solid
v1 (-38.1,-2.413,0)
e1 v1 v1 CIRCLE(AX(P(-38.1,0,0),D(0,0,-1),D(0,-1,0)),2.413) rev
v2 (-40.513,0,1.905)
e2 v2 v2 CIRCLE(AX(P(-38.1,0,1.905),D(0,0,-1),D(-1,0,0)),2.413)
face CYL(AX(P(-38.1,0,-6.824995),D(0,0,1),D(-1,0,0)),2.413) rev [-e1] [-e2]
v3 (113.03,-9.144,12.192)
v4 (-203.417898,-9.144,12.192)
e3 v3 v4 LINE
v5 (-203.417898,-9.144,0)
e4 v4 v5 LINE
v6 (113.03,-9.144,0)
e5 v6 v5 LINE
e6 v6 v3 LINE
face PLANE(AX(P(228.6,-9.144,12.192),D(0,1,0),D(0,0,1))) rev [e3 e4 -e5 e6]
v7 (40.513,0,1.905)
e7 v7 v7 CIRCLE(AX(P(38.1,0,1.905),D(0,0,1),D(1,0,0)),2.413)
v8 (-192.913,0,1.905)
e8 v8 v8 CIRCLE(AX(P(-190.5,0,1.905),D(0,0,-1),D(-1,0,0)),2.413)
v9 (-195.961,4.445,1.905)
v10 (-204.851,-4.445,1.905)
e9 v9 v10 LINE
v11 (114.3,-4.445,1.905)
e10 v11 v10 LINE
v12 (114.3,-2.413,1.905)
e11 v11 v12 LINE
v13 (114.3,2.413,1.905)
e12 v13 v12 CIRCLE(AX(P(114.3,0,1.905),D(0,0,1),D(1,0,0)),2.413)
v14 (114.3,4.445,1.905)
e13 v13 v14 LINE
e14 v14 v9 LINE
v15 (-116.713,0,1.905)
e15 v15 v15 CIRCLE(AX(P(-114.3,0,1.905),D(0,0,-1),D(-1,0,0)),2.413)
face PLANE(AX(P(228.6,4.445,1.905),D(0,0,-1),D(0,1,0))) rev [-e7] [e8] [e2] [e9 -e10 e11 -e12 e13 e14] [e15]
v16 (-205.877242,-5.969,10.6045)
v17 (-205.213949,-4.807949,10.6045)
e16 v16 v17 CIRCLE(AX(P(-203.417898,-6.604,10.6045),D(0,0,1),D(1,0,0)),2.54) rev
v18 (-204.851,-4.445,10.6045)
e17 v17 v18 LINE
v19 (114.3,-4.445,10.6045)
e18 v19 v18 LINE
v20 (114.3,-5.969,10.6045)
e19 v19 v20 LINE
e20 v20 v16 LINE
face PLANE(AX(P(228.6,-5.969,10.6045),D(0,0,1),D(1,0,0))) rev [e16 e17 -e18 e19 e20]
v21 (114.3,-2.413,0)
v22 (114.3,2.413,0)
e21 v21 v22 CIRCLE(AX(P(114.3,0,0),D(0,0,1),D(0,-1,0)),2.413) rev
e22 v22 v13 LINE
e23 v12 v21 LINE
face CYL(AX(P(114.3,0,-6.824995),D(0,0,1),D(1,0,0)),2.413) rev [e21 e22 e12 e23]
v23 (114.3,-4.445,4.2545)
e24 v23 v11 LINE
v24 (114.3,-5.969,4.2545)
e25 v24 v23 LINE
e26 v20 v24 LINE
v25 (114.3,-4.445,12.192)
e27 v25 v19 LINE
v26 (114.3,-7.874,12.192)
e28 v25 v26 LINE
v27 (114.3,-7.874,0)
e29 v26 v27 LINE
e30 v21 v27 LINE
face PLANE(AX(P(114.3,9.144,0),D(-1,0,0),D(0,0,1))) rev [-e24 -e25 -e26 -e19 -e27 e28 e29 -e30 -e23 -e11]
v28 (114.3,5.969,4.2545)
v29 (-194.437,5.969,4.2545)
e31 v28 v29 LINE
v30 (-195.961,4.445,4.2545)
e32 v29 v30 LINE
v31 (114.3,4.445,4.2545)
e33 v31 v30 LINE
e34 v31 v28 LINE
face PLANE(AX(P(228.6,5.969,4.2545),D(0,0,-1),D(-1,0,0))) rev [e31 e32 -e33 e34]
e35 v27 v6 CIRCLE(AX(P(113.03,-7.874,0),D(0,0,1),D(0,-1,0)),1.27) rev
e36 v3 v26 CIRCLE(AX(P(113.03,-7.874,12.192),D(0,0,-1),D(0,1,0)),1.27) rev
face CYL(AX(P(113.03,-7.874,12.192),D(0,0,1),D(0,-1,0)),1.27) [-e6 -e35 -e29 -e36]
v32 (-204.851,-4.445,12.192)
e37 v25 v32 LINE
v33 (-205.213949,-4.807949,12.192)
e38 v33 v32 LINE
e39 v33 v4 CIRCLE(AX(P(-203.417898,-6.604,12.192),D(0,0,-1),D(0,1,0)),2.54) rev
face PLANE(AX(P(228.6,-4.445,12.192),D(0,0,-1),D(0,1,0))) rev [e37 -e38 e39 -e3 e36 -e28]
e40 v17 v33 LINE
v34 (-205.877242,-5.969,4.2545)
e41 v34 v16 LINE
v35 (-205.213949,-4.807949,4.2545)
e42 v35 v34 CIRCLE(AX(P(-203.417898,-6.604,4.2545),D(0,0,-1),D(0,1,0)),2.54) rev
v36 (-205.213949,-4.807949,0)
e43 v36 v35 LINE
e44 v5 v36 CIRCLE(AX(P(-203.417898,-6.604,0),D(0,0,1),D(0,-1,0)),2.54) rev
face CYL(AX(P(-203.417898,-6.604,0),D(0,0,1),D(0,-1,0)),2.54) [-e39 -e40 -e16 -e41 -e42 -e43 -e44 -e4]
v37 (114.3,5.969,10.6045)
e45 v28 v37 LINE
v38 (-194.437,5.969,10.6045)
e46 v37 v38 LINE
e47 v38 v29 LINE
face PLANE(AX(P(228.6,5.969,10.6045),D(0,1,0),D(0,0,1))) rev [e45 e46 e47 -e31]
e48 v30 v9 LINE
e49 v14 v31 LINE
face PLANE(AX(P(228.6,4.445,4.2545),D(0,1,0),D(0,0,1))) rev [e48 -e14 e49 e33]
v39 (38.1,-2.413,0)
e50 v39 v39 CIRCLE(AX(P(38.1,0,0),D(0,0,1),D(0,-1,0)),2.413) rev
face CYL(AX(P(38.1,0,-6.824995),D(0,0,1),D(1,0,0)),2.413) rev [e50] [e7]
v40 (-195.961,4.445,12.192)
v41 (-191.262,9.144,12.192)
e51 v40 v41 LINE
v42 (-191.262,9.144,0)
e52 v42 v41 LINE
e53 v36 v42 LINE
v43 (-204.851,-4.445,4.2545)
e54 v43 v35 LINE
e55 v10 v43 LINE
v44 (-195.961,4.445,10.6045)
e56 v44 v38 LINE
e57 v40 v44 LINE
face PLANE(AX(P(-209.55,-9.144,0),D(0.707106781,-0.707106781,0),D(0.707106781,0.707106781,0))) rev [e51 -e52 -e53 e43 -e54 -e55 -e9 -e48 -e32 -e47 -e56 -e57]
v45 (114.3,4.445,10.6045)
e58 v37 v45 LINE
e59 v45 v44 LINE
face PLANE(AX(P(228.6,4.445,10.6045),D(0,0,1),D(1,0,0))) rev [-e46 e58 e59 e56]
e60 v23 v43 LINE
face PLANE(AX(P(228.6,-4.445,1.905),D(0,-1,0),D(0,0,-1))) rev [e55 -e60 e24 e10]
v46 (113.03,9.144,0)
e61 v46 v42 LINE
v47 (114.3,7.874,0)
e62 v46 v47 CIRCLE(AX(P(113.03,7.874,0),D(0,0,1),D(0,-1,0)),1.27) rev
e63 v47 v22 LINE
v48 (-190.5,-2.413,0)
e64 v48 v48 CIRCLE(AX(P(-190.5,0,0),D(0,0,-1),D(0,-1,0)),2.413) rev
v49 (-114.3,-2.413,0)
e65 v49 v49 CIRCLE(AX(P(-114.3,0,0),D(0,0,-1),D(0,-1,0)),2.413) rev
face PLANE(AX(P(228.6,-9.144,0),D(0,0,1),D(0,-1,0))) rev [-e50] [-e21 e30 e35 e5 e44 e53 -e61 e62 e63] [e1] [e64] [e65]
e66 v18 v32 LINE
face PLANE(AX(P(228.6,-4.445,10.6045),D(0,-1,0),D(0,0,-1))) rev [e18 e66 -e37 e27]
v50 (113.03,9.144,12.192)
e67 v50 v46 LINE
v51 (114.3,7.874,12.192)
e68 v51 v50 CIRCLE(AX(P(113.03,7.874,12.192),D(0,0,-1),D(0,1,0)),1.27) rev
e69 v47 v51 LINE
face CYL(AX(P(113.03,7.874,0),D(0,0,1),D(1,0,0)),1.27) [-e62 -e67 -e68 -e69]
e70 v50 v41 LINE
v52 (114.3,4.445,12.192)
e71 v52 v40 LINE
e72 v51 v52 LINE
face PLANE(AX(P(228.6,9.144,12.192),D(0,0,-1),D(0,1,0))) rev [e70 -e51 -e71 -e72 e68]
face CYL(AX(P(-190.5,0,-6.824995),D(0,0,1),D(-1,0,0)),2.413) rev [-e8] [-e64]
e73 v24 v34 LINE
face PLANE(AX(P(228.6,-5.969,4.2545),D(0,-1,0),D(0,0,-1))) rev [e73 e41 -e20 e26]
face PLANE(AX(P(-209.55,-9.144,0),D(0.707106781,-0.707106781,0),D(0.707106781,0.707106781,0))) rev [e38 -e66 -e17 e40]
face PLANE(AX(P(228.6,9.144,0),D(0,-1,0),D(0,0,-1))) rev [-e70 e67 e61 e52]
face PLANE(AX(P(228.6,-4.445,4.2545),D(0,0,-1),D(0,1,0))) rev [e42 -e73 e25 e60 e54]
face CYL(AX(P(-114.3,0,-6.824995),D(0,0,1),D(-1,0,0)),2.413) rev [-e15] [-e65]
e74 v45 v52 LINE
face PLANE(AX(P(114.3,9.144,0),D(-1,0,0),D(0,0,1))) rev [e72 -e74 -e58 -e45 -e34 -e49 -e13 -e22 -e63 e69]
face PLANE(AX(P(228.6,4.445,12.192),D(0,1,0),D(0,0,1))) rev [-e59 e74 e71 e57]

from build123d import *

# Parameters (mm, degrees)
BOSS_EXTRUDE1_DEPTH = 228.6
SKETCH3_R           = 2.413
CUT_EXTRUDE1_DEPTH  = 1.905
LPATTERN1_COUNT     = 3
LPATTERN1_PITCH     = 76.2
CUT_EXTRUDE3_DEPTH  = 230.107436806
FILLET1_R           = 2.54
SKETCH5_W           = 114.3
SKETCH5_H           = 18.288
CUT_EXTRUDE4_DEPTH  = 230.107436806
FILLET2_R           = 1.27


with BuildPart() as part:
    # Sketch2 → Boss-Extrude1 (new, symmetric)
    with BuildSketch(Plane(origin=(0, 0, 0), x_dir=(0, 0, -1), z_dir=(1, 0, 0))):
        Polygon((0, 9.144), (-12.192, 9.144), (-12.192, 4.445), (-10.6045, 4.445), (-10.6045, 5.969), (-4.2545, 5.969), (-4.2545, 4.445), (-1.905, 4.445), (-1.905, -4.445), (-4.2545, -4.445), (-4.2545, -5.969), (-10.6045, -5.969), (-10.6045, -4.445), (-12.192, -4.445), (-12.192, -9.144), (0, -9.144), align=None)
    extrude(amount=BOSS_EXTRUDE1_DEPTH, both=True)

    # Sketch3 → Cut-Extrude1 (cut)
    with BuildSketch(Plane.XY.offset(1.905)):
        with Locations((38.1, 0)):
            Circle(SKETCH3_R)
    cut_extrude1 = extrude(amount=-CUT_EXTRUDE1_DEPTH, mode=Mode.SUBTRACT)

    # LPattern1: Cut-Extrude1 ×3
    with Locations(*[(i * LPATTERN1_PITCH, 0, 0) for i in range(1, LPATTERN1_COUNT)]):
        add(cut_extrude1, mode=Mode.SUBTRACT)

    # SurfaceCut1
    split(bisect_by=Plane(origin=(0, 0, 0), x_dir=(0, 0, -1), z_dir=(1, 0, 0)), keep=Keep.TOP)

    # Mirror1: part across plane


with BuildPart() as part_1:
    add(part.part)
    add(part.part.mirror(Plane(origin=(0, 0, 0), x_dir=(0, 0, 1), z_dir=(1, 0, 0))))

    # Sketch4 → Cut-Extrude3 (cut, through all)
    with BuildSketch(Plane.XY.offset(12.192)):
        Polygon((-209.55, -9.144), (-191.262, 9.144), (-228.6, 9.144), (-228.6, -9.144), align=None)
    extrude(amount=-CUT_EXTRUDE3_DEPTH, mode=Mode.SUBTRACT)

    # Fillet1
    # the kernel refuses this fillet: 2.54 mm, written as the material it takes off along each edge
    with BuildSketch(Plane(origin=(-209.55, -9.144, 27.522256121), x_dir=(0.7071067811865455, 0.7071067811865496, 0), z_dir=(0, 0, -1))) as fillet1_piece_1:
        with BuildLine():
            CenterArc((FILLET1_R * 2.41421356237, FILLET1_R), FILLET1_R, 135, 135)
            Line((FILLET1_R * 1.70710678119, FILLET1_R * 1.70710678119), (0, 0))
            Line((0, 0), (FILLET1_R * 2.41421356237, 0))
        make_face()
    extrude(amount=42.852512242, mode=Mode.SUBTRACT)

    # Sketch5 → Cut-Extrude4 (cut, through all)
    with BuildSketch(Plane.XY.offset(12.192)):
        with Locations((171.45, 0)):
            Rectangle(SKETCH5_W, SKETCH5_H)
    extrude(amount=-CUT_EXTRUDE4_DEPTH, mode=Mode.SUBTRACT)

    # Fillet2
    fillet2_edges = [part_1.edges().sort_by_distance(p)[0] for p in [
        (114.3, -9.144, 6.096),
        (114.3, 9.144, 6.096),
    ]]
    fillet(fillet2_edges, radius=FILLET2_R)


solid = part_1.part
